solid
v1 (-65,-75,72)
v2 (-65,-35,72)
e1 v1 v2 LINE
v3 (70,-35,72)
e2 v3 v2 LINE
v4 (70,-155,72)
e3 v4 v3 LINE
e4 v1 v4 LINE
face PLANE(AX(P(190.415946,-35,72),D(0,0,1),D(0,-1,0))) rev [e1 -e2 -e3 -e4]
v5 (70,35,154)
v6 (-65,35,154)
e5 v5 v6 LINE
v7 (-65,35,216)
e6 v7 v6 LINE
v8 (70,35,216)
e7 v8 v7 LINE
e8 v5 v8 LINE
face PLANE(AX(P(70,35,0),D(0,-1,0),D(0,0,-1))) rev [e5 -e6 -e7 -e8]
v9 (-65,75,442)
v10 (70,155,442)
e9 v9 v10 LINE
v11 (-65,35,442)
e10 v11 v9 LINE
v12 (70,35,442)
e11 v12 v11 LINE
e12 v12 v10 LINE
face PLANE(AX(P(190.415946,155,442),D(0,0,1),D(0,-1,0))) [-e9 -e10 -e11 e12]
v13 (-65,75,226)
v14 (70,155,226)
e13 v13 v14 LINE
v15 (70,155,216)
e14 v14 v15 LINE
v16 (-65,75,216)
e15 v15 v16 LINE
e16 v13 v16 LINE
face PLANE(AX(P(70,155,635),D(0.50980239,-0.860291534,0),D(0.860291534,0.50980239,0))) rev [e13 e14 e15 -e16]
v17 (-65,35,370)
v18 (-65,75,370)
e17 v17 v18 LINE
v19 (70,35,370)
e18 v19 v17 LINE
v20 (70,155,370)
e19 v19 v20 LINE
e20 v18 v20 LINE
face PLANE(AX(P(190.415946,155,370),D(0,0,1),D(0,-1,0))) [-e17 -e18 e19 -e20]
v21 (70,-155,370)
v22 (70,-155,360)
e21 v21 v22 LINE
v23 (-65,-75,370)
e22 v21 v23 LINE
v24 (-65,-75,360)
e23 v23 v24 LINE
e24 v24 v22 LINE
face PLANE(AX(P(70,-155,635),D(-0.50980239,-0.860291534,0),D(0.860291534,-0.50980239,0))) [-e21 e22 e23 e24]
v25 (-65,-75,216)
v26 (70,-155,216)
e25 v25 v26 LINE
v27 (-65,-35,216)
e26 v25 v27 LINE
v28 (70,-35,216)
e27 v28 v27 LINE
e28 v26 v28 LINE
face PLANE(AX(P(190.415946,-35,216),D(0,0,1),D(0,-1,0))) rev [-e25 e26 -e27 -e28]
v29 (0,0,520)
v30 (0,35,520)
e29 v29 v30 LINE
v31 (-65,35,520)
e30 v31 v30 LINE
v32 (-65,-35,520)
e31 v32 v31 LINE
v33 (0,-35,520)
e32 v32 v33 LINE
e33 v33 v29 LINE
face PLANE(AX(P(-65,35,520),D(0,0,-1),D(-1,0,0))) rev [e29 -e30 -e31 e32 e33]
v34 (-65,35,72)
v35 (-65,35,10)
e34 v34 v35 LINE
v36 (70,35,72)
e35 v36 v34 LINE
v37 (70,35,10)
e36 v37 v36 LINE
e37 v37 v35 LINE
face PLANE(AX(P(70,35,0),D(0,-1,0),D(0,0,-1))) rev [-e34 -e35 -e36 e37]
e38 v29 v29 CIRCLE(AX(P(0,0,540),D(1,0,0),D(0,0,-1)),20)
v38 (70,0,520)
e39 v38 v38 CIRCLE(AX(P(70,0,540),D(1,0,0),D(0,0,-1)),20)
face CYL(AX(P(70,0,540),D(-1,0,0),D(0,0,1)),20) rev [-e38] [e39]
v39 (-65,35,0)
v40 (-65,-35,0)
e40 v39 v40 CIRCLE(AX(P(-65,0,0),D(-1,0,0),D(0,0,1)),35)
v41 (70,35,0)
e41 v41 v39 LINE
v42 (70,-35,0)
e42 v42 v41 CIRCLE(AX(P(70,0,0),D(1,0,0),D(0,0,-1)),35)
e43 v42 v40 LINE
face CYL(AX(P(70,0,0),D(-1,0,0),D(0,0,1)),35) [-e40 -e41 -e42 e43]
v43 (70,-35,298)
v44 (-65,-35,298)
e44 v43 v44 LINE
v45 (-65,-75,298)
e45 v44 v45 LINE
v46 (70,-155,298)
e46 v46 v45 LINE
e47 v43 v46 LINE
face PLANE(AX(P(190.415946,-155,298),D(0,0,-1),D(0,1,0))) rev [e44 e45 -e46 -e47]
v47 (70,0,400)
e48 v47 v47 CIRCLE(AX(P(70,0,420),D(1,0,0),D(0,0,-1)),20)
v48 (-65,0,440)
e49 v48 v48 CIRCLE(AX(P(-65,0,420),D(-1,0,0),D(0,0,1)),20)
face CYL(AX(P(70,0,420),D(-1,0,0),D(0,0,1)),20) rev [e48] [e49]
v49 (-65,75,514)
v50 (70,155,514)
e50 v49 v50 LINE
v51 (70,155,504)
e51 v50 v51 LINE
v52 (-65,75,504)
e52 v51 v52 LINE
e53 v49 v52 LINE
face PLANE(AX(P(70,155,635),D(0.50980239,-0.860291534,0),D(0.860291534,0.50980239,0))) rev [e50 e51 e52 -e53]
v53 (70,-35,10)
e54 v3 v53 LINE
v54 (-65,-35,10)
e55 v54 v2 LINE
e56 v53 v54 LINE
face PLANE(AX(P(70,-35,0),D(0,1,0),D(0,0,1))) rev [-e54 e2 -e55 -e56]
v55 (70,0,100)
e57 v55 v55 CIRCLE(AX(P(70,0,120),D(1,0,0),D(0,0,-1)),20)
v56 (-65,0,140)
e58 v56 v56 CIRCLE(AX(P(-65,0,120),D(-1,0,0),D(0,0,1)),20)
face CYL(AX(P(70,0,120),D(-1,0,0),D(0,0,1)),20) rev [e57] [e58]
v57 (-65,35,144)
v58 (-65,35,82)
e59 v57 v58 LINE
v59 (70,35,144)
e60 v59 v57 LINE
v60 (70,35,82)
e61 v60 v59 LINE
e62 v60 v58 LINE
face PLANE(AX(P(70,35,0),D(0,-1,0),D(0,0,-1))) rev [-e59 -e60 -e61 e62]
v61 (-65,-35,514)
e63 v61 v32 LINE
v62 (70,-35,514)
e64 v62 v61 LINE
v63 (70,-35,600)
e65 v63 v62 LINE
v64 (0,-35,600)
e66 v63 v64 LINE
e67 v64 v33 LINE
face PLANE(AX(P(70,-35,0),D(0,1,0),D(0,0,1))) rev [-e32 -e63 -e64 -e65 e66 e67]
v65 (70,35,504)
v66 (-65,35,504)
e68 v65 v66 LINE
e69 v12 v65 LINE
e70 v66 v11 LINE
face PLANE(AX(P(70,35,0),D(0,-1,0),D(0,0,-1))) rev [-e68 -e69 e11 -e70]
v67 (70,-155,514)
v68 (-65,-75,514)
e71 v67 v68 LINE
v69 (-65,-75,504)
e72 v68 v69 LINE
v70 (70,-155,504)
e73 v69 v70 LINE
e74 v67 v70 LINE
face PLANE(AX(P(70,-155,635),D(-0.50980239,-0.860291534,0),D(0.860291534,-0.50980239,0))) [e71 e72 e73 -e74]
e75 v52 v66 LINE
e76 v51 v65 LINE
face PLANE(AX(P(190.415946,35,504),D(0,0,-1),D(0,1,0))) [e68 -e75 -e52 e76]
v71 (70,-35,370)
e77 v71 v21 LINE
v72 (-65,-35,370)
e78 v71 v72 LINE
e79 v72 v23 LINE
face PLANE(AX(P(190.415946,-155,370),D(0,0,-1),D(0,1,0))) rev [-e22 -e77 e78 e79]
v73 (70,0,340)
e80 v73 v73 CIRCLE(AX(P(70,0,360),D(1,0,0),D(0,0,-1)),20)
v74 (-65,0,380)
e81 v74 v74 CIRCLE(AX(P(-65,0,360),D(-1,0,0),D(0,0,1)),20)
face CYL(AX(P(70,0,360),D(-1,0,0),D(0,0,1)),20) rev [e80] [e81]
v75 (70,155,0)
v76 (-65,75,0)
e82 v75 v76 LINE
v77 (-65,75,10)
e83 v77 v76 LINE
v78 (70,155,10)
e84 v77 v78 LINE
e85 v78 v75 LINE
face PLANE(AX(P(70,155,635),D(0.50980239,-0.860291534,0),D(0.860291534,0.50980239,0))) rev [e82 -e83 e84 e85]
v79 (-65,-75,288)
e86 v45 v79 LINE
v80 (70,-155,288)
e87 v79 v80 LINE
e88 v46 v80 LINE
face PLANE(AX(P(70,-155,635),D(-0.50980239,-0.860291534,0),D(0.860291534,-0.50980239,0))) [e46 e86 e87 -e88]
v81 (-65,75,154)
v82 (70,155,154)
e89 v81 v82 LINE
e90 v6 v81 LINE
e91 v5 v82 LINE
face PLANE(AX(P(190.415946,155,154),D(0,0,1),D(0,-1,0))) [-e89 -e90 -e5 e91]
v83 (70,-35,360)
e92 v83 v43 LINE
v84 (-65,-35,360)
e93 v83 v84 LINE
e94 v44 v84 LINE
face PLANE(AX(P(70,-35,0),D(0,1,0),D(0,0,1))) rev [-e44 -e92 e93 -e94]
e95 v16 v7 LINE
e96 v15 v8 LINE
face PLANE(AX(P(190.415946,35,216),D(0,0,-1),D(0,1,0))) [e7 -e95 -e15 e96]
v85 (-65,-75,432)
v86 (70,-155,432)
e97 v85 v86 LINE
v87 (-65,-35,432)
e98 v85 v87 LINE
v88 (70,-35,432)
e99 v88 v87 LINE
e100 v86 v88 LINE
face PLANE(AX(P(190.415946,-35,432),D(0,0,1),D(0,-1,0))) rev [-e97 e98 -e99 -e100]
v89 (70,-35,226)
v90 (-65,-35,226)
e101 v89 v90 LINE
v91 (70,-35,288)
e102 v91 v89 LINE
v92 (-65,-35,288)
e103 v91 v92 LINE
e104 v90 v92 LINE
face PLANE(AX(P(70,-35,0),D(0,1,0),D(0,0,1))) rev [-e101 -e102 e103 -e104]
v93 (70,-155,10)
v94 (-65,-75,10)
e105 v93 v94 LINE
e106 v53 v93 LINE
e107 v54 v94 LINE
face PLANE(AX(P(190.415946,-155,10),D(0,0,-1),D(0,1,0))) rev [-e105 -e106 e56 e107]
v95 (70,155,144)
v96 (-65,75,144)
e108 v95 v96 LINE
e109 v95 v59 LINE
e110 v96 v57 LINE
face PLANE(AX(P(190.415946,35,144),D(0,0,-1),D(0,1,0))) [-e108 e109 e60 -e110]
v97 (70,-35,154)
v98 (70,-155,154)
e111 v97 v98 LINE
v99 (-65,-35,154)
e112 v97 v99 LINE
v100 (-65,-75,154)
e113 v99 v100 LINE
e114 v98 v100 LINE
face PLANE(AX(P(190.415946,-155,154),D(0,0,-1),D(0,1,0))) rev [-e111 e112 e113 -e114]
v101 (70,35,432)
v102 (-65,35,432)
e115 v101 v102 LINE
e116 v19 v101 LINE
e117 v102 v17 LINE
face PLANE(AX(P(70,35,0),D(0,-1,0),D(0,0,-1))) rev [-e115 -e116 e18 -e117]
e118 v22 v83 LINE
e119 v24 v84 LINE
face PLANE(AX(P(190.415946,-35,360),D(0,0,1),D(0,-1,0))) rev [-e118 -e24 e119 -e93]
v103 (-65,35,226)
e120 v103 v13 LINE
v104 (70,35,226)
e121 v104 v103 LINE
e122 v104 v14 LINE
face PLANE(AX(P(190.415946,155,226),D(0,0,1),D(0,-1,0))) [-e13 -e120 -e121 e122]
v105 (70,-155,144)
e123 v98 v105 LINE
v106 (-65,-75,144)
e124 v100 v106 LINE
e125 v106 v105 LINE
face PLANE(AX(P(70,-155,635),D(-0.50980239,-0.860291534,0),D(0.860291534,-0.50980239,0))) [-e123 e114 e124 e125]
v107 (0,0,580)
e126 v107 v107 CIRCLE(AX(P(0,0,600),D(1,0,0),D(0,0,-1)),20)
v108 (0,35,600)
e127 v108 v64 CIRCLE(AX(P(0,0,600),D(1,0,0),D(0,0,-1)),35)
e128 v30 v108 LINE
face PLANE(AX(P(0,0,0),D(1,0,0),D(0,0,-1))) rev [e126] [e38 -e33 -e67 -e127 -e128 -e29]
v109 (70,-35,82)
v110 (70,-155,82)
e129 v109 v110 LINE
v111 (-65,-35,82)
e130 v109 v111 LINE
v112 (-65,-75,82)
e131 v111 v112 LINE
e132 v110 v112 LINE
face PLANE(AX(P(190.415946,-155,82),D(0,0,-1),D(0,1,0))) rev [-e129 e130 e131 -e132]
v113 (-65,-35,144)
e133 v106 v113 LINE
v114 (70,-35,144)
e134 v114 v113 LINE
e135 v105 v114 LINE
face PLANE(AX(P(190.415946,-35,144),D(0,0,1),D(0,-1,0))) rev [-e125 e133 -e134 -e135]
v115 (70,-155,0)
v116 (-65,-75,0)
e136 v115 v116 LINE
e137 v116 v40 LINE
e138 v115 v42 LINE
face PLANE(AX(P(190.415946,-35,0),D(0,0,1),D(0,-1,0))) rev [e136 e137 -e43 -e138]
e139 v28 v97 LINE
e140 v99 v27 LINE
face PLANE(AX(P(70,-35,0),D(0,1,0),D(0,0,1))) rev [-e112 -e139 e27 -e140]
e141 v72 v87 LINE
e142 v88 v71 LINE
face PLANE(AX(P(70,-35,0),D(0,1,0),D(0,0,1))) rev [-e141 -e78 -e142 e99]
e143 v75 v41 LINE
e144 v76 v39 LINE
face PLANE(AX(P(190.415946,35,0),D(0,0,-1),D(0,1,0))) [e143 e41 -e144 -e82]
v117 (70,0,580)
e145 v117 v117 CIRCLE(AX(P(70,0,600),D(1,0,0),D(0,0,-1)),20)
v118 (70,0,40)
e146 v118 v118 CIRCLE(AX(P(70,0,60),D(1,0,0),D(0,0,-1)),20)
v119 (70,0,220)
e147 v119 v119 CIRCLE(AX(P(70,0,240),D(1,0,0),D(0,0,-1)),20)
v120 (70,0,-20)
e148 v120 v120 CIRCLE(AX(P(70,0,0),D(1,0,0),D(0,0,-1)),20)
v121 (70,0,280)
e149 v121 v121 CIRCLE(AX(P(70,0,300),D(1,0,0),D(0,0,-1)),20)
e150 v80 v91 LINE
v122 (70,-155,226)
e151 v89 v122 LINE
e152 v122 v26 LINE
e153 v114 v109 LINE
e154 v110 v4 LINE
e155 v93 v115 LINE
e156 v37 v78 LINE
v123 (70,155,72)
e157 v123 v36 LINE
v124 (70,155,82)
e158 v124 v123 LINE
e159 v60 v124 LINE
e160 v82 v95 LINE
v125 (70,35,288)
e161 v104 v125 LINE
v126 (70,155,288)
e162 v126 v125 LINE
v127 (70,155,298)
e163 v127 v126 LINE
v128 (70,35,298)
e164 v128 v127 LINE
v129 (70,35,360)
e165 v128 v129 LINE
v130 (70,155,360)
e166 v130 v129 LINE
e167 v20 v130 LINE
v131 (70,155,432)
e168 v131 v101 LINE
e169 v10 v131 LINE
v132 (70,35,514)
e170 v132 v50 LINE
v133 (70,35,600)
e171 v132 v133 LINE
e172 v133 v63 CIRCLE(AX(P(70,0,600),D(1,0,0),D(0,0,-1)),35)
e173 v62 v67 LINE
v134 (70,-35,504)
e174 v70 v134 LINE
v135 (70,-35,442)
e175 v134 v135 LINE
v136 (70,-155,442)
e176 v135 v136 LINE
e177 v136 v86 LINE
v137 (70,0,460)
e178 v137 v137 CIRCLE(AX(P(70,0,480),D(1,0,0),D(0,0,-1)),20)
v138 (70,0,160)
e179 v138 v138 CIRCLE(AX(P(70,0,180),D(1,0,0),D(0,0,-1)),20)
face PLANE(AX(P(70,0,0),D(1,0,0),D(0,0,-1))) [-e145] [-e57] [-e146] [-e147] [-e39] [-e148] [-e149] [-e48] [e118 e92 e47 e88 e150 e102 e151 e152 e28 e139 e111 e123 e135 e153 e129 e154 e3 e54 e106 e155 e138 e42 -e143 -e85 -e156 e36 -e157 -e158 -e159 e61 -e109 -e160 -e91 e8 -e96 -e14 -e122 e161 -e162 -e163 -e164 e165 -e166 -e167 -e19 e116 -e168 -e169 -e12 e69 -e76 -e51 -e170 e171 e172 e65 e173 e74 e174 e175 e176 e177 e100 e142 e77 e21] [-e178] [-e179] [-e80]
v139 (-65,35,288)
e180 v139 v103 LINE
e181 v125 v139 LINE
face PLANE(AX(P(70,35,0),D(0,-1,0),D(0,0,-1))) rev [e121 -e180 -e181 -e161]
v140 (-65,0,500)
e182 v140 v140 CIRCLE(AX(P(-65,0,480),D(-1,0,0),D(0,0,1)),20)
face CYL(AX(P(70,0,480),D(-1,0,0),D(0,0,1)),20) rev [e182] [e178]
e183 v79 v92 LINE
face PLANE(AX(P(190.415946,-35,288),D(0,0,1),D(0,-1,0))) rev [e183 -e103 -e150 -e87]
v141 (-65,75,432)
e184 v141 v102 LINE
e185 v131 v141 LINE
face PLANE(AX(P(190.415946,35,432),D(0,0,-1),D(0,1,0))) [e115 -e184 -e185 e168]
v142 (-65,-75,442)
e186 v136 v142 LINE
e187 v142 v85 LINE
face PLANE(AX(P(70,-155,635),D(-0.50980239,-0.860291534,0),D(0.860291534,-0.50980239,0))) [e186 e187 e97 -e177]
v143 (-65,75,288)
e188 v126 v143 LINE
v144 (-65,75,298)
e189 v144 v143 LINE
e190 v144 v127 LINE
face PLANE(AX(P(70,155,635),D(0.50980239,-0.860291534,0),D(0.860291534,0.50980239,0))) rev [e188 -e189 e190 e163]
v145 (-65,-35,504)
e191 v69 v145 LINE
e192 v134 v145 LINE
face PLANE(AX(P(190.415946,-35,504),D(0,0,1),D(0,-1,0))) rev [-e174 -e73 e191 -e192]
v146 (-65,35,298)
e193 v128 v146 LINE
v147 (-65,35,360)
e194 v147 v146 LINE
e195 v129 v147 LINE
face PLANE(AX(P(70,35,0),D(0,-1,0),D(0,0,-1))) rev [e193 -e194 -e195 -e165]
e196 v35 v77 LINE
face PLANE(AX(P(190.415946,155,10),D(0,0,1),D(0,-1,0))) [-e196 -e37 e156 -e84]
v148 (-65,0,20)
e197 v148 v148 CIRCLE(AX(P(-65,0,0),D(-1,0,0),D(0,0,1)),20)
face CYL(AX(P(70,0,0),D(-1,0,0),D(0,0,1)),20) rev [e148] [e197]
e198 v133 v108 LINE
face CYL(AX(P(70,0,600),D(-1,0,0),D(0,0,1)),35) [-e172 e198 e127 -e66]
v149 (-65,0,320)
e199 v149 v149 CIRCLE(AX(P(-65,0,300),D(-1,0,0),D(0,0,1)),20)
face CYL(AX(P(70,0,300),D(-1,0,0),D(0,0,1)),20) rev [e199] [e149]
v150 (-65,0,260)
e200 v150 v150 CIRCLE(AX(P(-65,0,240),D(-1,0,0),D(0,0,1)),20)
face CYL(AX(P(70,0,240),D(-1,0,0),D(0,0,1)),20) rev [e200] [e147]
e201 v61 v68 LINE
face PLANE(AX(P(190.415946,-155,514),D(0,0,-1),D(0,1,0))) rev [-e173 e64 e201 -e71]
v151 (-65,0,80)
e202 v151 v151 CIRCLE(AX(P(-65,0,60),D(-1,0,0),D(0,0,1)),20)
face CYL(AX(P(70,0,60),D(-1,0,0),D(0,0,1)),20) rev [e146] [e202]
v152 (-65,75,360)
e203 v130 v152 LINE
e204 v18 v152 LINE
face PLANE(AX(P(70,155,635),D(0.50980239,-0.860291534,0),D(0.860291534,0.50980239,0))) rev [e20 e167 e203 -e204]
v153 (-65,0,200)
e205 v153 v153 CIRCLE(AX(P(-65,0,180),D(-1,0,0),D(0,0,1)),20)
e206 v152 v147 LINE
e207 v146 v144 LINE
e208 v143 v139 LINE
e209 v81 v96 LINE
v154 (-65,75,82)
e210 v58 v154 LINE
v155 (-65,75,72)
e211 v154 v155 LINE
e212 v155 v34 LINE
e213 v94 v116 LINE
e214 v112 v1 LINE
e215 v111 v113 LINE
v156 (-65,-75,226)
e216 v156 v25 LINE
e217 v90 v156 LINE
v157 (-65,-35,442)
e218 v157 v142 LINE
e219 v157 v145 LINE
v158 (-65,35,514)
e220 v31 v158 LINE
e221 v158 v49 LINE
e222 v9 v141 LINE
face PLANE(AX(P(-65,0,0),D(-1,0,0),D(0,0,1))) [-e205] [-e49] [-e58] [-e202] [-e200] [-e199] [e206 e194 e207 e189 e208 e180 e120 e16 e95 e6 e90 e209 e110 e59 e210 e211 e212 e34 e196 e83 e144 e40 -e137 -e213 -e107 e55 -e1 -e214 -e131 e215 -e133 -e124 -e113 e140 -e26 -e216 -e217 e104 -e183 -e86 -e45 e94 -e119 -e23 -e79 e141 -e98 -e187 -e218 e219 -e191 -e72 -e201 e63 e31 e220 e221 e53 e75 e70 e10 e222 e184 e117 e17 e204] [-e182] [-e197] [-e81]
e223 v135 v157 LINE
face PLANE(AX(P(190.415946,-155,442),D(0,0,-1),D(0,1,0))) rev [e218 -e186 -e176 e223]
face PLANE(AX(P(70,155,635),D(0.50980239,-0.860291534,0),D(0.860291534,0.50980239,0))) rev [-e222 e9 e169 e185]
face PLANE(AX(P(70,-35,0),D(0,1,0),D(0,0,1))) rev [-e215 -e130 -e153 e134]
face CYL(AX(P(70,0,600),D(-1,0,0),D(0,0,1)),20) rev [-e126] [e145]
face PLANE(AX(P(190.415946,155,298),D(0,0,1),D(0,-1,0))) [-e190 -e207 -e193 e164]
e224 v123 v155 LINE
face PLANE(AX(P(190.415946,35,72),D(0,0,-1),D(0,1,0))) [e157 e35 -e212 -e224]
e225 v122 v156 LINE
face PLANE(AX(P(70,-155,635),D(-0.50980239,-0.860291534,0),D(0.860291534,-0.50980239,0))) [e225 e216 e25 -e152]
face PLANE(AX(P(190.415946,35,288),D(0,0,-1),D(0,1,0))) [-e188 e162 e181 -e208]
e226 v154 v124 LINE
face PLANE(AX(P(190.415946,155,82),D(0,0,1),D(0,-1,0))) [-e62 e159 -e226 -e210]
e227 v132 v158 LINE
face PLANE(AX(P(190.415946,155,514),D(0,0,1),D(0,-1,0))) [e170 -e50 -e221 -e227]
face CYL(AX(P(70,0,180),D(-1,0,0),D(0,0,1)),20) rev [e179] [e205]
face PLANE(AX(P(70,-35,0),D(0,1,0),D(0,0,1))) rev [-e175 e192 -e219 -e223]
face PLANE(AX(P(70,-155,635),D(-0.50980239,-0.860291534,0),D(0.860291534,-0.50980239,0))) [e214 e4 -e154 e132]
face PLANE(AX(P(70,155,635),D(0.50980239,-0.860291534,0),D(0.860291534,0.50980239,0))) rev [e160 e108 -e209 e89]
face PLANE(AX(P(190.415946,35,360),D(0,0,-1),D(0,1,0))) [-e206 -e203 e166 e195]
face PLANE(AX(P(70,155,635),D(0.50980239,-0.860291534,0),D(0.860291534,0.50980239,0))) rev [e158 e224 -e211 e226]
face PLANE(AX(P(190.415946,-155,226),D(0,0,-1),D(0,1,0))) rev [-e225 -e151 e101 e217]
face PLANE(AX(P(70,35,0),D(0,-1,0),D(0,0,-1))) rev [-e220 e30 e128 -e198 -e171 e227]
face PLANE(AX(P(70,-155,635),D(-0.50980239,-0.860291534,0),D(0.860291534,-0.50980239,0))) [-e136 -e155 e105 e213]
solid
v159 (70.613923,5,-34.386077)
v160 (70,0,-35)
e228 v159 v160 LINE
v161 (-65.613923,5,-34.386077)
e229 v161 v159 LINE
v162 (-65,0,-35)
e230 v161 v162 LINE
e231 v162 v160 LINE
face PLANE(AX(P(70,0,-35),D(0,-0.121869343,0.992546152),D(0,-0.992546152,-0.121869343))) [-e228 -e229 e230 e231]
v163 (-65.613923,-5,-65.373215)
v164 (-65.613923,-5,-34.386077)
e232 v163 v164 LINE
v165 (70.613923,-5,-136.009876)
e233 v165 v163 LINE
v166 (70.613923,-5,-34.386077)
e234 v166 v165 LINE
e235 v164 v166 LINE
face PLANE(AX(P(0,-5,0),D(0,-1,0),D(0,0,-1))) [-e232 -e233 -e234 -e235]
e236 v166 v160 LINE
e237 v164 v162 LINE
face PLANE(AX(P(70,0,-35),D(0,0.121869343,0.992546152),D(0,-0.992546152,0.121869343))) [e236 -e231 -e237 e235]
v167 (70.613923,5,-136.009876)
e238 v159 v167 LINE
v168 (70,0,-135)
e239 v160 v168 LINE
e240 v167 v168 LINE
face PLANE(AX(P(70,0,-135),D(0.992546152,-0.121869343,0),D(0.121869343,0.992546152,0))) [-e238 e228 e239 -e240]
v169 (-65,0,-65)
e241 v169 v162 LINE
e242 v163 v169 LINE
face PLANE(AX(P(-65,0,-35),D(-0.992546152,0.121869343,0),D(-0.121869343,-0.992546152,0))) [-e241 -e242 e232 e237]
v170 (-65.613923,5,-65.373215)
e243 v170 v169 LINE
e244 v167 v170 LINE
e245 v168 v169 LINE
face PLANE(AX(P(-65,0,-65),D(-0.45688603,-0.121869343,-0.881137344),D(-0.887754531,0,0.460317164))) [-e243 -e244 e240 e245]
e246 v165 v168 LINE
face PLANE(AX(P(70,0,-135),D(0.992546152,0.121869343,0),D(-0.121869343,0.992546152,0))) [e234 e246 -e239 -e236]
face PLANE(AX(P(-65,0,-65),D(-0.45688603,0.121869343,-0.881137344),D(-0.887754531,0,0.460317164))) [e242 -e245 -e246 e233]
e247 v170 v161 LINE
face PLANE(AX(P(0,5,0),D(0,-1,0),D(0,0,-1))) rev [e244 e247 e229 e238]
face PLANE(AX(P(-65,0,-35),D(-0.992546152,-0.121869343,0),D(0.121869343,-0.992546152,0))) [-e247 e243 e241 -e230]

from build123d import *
from build123d.topology import SkipClean

# Parameters (mm, degrees)
SKETCH1_R                     = 20
BOSS_EXTRUDE1_DEPTH           = 70
BOSS_EXTRUDE2_START           = 65
SKETCH2_R                     = 20
BOSS_EXTRUDE2_DEPTH           = 65
SKETCH3_W                     = 10
SKETCH3_H                     = 120
BOSS_EXTRUDE3_DEPTH           = 135
CUT_EXTRUDE1_DEPTH            = 658.381167969
LPATTERN1_COUNT               = 8
LPATTERN1_PITCH               = 72
MIRROR1_DEPTH                 = 10
MIRROR1_START                 = 72
MIRROR1_2_DEPTH               = 10
MIRROR1_START_2               = 144
MIRROR1_3_DEPTH               = 10
MIRROR1_START_3               = 216
MIRROR1_4_DEPTH               = 10
MIRROR1_START_4               = 288
MIRROR1_5_DEPTH               = 10
MIRROR1_START_5               = 360
MIRROR1_6_DEPTH               = 10
MIRROR1_START_6               = 432
MIRROR1_7_DEPTH               = 10
MIRROR1_START_7               = 504
MIRROR1_8_DEPTH               = 10
BOSS_EXTRUDE4_DEPTH           = 5
BOSS_EXTRUDE4_TAPER           = -7
BOSS_EXTRUDE4_OTHER_WAY_DEPTH = 5
BOSS_EXTRUDE4_OTHER_WAY_TAPER = -7


# Read off the part's stored shape, not the designer's step: Mirror1
with BuildPart() as part:
    # Sketch1 → Boss-Extrude1 (new body)
    with BuildSketch(Plane(origin=(0, 0, 0), x_dir=(0, 0, -1), z_dir=(1, 0, 0))):
        with BuildLine():
            Line((0, -35), (-600, -35))
            ThreePointArc((-600, -35), (-635, 0), (-600, 35))
            Line((-600, 35), (0, 35))
            ThreePointArc((0, 35), (35, 0), (0, -35))
        make_face()
        with Locations((-600, 0)):
            Circle(SKETCH1_R, mode=Mode.SUBTRACT)
        with Locations((-540, 0)):
            Circle(SKETCH1_R, mode=Mode.SUBTRACT)
        with Locations((-480, 0)):
            Circle(SKETCH1_R, mode=Mode.SUBTRACT)
        with Locations((-420, 0)):
            Circle(SKETCH1_R, mode=Mode.SUBTRACT)
        with Locations((-360, 0)):
            Circle(SKETCH1_R, mode=Mode.SUBTRACT)
        with Locations((-300, 0)):
            Circle(SKETCH1_R, mode=Mode.SUBTRACT)
        with Locations((-240, 0)):
            Circle(SKETCH1_R, mode=Mode.SUBTRACT)
        with Locations((-180, 0)):
            Circle(SKETCH1_R, mode=Mode.SUBTRACT)
        with Locations((-120, 0)):
            Circle(SKETCH1_R, mode=Mode.SUBTRACT)
        with Locations((-60, 0)):
            Circle(SKETCH1_R, mode=Mode.SUBTRACT)
        Circle(SKETCH1_R, mode=Mode.SUBTRACT)
    extrude(amount=BOSS_EXTRUDE1_DEPTH)

    # Sketch2 → Boss-Extrude2 (add)
    with SkipClean():  # the faces are left unmerged after this step: merging them gives an invalid solid
        with BuildSketch(Plane.ZY.offset(BOSS_EXTRUDE2_START)):
            with BuildLine():
                Line((520, -35), (0, -35))
                ThreePointArc((0, -35), (-35, 0), (0, 35))
                Line((0, 35), (520, 35))
                Line((520, 35), (520, -35))
            make_face()
            with Locations((480, 0)):
                Circle(SKETCH2_R, mode=Mode.SUBTRACT)
            with Locations((420, 0)):
                Circle(SKETCH2_R, mode=Mode.SUBTRACT)
            with Locations((360, 0)):
                Circle(SKETCH2_R, mode=Mode.SUBTRACT)
            with Locations((300, 0)):
                Circle(SKETCH2_R, mode=Mode.SUBTRACT)
            with Locations((240, 0)):
                Circle(SKETCH2_R, mode=Mode.SUBTRACT)
            with Locations((180, 0)):
                Circle(SKETCH2_R, mode=Mode.SUBTRACT)
            with Locations((120, 0)):
                Circle(SKETCH2_R, mode=Mode.SUBTRACT)
            with Locations((60, 0)):
                Circle(SKETCH2_R, mode=Mode.SUBTRACT)
            Circle(SKETCH2_R, mode=Mode.SUBTRACT)
        extrude(amount=-BOSS_EXTRUDE2_DEPTH)

    # Sketch3 → Boss-Extrude3 (add)
    with SkipClean():  # the faces are left unmerged after this step: merging them gives an invalid solid
        with BuildSketch(Plane.ZY.offset(65)):
            with Locations((5, 95)):
                Rectangle(SKETCH3_W, SKETCH3_H)
        boss_extrude3 = extrude(amount=-BOSS_EXTRUDE3_DEPTH)

    # Sketch4 → Cut-Extrude1 (cut, through all)
    with SkipClean():  # the faces are left unmerged after this step: merging them gives an invalid solid
        with BuildSketch(Plane(origin=(0, 0, 0), x_dir=(-1, 0, 0), z_dir=(0, 0, -1))):
            Polygon((-70, 155), (65, 75), (65, 155), align=None)
        cut_extrude1 = extrude(amount=-CUT_EXTRUDE1_DEPTH, mode=Mode.SUBTRACT)

    # LPattern1: Boss-Extrude3, Cut-Extrude1 ×8
    with SkipClean():  # the faces are left unmerged after this step: merging them gives an invalid solid
        with Locations(*[(0, 0, i * LPATTERN1_PITCH) for i in range(1, LPATTERN1_COUNT)]):
            add(boss_extrude3)
            add(cut_extrude1, mode=Mode.SUBTRACT)

    # Mirror1 outline → Mirror1 (add)
    with SkipClean():  # the faces are left unmerged after this step: merging them gives an invalid solid
        with BuildSketch(Plane.XY):
            Polygon((70, -35), (-65, -35), (-65, -75), (70, -155), align=None)
        extrude(amount=MIRROR1_DEPTH)

    # Mirror1 2 outline → Mirror1 2 (add)
    with SkipClean():  # the faces are left unmerged after this step: merging them gives an invalid solid
        with BuildSketch(Plane.XY.offset(MIRROR1_START)):
            Polygon((70, -35), (-65, -35), (-65, -75), (70, -155), align=None)
        extrude(amount=MIRROR1_2_DEPTH)

    # Mirror1 3 outline → Mirror1 3 (add)
    with SkipClean():  # the faces are left unmerged after this step: merging them gives an invalid solid
        with BuildSketch(Plane.XY.offset(MIRROR1_START_2)):
            Polygon((70, -35), (-65, -35), (-65, -75), (70, -155), align=None)
        extrude(amount=MIRROR1_3_DEPTH)

    # Mirror1 4 outline → Mirror1 4 (add)
    with SkipClean():  # the faces are left unmerged after this step: merging them gives an invalid solid
        with BuildSketch(Plane.XY.offset(MIRROR1_START_3)):
            Polygon((70, -35), (-65, -35), (-65, -75), (70, -155), align=None)
        extrude(amount=MIRROR1_4_DEPTH)

    # Mirror1 5 outline → Mirror1 5 (add)
    with SkipClean():  # the faces are left unmerged after this step: merging them gives an invalid solid
        with BuildSketch(Plane.XY.offset(MIRROR1_START_4)):
            Polygon((70, -35), (-65, -35), (-65, -75), (70, -155), align=None)
        extrude(amount=MIRROR1_5_DEPTH)

    # Mirror1 6 outline → Mirror1 6 (add)
    with SkipClean():  # the faces are left unmerged after this step: merging them gives an invalid solid
        with BuildSketch(Plane.XY.offset(MIRROR1_START_5)):
            Polygon((70, -35), (-65, -35), (-65, -75), (70, -155), align=None)
        extrude(amount=MIRROR1_6_DEPTH)

    # Mirror1 7 outline → Mirror1 7 (add)
    with SkipClean():  # the faces are left unmerged after this step: merging them gives an invalid solid
        with BuildSketch(Plane.XY.offset(MIRROR1_START_6)):
            Polygon((70, -35), (-65, -35), (-65, -75), (70, -155), align=None)
        extrude(amount=MIRROR1_7_DEPTH)

    # Mirror1 8 outline → Mirror1 8 (add)
    with SkipClean():  # the faces are left unmerged after this step: merging them gives an invalid solid
        with BuildSketch(Plane.XY.offset(MIRROR1_START_7)):
            Polygon((70, -35), (-65, -35), (-65, -75), (70, -155), align=None)
        extrude(amount=MIRROR1_8_DEPTH)


with BuildPart() as body_2:
    # Sketch5 → Boss-Extrude4 (new body)
    with BuildSketch(Plane(origin=(0, 0, 0), x_dir=(1, 0, 0), z_dir=(0, 1, 0))):
        Polygon((-65, 35), (70, 35), (70, 135), (-65, 65), align=None)
    extrude(amount=BOSS_EXTRUDE4_DEPTH, taper=BOSS_EXTRUDE4_TAPER)

    # Sketch5 → Boss-Extrude4 other way (add)
    with BuildSketch(Plane(origin=(0, 0, 0), x_dir=(1, 0, 0), z_dir=(0, 1, 0))):
        Polygon((-65, 35), (70, 35), (70, 135), (-65, 65), align=None)
    extrude(amount=-BOSS_EXTRUDE4_OTHER_WAY_DEPTH, taper=BOSS_EXTRUDE4_OTHER_WAY_TAPER)


solid = Compound([part.part, body_2.part])
